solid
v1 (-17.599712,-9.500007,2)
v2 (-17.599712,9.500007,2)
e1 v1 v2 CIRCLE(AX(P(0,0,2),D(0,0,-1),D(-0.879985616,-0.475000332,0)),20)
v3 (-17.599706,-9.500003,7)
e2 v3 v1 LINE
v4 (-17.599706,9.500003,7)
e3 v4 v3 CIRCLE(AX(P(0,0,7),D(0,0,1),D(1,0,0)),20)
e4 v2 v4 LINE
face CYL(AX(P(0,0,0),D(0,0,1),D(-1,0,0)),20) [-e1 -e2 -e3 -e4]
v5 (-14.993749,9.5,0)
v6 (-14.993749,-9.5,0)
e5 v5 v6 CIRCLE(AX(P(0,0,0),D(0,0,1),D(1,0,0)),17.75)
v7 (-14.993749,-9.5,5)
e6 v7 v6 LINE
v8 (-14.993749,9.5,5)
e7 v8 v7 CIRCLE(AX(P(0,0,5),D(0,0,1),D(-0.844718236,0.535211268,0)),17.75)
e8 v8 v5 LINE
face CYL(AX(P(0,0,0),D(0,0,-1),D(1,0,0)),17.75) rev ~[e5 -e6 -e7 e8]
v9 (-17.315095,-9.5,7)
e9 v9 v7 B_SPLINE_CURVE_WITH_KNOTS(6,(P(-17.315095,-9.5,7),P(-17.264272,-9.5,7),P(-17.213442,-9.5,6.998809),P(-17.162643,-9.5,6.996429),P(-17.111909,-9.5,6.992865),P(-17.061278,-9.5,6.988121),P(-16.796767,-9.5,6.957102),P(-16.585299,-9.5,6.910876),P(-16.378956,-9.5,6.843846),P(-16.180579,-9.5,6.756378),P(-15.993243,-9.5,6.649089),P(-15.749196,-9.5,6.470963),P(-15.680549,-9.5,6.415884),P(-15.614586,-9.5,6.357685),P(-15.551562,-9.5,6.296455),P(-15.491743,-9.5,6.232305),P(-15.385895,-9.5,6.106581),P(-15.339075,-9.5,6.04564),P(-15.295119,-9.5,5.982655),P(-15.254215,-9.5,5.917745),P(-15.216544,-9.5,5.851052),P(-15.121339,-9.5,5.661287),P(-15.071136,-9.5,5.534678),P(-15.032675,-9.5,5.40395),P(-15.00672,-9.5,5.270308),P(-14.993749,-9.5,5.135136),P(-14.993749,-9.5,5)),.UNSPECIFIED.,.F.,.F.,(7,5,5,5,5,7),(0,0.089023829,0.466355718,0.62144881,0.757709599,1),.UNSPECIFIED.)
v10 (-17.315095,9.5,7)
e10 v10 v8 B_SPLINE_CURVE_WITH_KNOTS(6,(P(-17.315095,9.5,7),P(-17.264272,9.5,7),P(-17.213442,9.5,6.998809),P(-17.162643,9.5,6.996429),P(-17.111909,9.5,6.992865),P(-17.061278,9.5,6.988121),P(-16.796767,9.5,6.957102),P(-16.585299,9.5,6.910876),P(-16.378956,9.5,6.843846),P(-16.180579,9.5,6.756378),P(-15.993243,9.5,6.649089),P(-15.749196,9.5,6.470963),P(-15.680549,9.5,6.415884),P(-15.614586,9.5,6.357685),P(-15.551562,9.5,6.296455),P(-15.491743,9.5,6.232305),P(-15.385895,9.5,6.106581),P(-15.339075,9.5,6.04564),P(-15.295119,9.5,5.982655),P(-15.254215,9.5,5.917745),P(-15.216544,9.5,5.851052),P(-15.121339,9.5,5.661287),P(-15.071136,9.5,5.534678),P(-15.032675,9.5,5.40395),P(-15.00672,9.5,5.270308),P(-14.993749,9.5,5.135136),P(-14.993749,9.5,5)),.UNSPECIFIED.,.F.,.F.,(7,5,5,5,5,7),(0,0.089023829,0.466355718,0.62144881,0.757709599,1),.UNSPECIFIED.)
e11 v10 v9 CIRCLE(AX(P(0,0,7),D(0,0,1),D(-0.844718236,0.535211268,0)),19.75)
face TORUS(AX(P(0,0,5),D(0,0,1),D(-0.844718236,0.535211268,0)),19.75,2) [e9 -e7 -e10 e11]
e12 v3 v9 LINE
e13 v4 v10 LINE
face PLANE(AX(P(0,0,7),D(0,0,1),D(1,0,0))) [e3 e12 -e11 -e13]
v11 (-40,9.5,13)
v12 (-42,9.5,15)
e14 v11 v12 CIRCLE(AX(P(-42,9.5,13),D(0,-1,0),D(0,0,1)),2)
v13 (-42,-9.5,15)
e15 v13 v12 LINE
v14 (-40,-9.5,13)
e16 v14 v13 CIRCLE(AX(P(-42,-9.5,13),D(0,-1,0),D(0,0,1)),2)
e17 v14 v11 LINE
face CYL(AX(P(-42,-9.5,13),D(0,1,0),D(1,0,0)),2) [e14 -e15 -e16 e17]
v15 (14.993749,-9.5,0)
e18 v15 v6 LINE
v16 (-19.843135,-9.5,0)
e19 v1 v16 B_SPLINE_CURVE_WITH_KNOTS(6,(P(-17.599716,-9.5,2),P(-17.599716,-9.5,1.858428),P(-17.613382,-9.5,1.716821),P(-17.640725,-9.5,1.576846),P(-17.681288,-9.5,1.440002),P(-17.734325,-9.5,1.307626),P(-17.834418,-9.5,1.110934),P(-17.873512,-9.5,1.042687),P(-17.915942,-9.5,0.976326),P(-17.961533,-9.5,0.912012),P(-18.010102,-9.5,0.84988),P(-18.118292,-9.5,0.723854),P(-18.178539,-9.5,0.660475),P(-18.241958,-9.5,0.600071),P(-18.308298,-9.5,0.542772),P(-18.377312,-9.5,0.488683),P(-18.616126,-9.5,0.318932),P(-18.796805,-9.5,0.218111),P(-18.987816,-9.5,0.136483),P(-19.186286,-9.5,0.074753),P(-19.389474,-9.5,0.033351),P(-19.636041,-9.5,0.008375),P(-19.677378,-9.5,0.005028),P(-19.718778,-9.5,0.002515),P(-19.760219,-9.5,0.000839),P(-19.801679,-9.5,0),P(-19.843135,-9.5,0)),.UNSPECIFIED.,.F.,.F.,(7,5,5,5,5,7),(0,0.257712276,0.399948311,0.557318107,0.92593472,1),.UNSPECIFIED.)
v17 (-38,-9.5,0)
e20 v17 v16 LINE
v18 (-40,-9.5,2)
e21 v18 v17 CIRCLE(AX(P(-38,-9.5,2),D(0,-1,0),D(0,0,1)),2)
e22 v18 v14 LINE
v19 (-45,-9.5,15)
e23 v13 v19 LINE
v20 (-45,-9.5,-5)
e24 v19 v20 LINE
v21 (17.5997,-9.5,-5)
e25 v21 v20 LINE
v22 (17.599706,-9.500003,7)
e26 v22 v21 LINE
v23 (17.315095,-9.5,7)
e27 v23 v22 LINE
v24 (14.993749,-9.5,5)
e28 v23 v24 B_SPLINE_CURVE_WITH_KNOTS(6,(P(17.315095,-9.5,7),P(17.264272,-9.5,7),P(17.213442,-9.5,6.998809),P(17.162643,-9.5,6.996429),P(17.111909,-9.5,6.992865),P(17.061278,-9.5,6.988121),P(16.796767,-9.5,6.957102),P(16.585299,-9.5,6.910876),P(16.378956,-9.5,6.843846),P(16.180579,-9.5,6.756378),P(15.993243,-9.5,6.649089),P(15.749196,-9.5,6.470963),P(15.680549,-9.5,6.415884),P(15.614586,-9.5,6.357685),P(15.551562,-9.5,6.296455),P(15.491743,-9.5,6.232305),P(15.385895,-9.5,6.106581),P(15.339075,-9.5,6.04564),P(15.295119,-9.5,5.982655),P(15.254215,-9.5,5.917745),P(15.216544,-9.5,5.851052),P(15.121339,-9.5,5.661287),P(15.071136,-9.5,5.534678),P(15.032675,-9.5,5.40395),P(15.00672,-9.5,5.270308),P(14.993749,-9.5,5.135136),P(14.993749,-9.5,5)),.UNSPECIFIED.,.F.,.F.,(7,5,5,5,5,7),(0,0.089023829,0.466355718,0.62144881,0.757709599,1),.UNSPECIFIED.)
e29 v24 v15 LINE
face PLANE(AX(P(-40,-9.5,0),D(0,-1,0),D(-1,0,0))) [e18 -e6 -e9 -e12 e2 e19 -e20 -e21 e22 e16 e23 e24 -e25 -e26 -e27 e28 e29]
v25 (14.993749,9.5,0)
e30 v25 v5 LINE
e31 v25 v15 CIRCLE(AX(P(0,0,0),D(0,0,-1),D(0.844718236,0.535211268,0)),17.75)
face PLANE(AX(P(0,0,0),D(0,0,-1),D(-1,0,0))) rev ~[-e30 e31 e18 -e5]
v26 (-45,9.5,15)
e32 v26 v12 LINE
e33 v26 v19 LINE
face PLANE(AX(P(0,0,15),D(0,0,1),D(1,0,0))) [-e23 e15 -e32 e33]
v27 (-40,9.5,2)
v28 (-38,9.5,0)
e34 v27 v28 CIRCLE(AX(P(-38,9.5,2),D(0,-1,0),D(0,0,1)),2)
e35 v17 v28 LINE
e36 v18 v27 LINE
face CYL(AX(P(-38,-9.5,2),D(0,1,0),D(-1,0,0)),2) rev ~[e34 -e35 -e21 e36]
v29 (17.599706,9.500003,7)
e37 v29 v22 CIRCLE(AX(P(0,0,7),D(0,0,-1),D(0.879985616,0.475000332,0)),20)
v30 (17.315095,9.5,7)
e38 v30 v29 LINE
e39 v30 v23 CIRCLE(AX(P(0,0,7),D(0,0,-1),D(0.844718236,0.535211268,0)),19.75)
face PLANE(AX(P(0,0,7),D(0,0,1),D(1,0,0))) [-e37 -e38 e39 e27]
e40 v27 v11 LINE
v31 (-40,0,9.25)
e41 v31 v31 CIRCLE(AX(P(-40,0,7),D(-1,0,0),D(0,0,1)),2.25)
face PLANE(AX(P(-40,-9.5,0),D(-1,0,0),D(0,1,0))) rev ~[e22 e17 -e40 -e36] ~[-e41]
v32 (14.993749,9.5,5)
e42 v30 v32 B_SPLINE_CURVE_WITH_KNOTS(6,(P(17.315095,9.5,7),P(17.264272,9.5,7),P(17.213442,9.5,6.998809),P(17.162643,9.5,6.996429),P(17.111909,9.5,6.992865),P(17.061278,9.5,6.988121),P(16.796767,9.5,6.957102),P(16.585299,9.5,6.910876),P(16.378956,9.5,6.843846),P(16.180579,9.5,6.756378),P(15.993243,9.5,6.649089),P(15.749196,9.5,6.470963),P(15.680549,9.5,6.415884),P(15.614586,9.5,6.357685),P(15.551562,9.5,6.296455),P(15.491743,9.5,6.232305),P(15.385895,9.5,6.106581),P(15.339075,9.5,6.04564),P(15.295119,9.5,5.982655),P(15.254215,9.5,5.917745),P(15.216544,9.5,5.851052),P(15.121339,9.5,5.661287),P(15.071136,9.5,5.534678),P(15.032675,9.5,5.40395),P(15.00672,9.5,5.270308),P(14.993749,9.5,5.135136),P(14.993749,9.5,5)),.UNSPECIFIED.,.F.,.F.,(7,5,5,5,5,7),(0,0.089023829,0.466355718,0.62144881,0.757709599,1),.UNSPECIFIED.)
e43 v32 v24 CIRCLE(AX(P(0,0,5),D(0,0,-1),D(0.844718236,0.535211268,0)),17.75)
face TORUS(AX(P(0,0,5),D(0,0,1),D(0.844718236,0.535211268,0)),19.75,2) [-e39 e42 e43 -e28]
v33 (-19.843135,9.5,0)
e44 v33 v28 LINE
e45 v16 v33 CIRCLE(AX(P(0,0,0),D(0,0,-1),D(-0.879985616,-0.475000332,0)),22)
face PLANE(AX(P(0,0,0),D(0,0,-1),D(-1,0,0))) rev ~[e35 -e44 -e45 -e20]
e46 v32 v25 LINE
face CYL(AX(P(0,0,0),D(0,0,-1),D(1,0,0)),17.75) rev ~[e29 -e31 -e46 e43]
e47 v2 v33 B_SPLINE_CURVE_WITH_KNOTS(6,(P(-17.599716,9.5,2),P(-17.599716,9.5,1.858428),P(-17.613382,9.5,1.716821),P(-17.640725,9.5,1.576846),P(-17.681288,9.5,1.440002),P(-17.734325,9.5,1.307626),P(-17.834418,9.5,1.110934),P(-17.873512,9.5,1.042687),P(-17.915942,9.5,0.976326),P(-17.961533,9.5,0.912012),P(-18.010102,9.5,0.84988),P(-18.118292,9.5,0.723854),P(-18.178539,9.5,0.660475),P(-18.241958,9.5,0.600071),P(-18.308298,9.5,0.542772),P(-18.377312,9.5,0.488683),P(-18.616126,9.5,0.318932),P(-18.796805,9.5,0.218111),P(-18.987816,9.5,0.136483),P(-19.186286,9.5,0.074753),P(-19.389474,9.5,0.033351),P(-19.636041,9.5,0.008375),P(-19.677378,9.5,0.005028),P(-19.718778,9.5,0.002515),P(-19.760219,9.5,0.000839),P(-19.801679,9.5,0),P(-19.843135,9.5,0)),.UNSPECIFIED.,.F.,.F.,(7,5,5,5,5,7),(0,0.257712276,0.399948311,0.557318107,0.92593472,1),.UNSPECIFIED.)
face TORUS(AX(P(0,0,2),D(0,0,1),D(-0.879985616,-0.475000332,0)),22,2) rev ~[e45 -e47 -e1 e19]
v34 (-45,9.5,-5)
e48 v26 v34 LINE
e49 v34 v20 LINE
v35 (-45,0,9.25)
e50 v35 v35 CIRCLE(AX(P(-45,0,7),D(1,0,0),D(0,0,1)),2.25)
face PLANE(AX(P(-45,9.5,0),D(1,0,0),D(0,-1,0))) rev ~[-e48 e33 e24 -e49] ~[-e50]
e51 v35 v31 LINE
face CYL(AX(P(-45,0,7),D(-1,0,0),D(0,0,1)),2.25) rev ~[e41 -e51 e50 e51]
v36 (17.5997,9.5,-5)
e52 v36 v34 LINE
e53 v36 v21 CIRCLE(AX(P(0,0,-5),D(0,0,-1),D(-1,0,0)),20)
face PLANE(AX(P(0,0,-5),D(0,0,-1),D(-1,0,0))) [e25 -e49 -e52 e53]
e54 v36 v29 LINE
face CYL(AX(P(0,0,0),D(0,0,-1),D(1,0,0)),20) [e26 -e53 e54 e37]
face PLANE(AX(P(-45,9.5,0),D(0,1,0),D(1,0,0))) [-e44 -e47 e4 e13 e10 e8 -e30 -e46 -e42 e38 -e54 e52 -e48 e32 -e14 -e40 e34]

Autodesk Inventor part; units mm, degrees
ref_plane "YZ Plane" through (0, 0, 0) normal (1, 0, 0) x (0, 1, 0)
ref_plane "XZ Plane" through (0, 0, 0) normal (0, 1, 0) x (-1, 0, 0)
ref_plane "XY Plane" through (0, 0, 0) normal (0, 0, 1) x (1, 0, 0)
sketch "Sketch1" plane through (0, 0, 0) normal (0, 0, 1) x (1, 0, 0)
  circle A0 centre (0, 0) radius 17.75
  circle A1 centre (0, 0) radius 20
  dimension "d0" = 35.5
  dimension "d1" = 40
extrude "Extrusion1" add sketch "Sketch1" along normal blind 7
sketch "Sketch2" plane through (0, 0, 0) normal (0, 0, -1) x (-1, 0, 0)
  circle A0 centre (0, 0) radius 20 projected
extrude "Extrusion2" add sketch "Sketch2" along normal blind 5
sketch "Sketch3" plane through (0, 0, -5) normal (0, 0, -1) x (-1, 0, 0)
  circle A0 centre (0, 0) radius 20 projected
  line L0 (-17.5997, 9.5) -> (17.5997, 9.5)
  line L1 (-17.5997, -9.5) -> (17.5997, -9.5)
  circle A1 centre (0, 0) radius 20 projected
  line L2 (58, 0) -> (-33, 0) projected
  dimension "d6" = 19
  dimension "d7" = 9.5
extrude "Extrusion3" cut sketch "Sketch3" against normal through all contours L0 A0 | A0 L1
sketch "Sketch4" plane through (0, 0, -5) normal (0, 0, -1) x (-1, 0, 0)
  arc A0 (17.5997, -9.5) -> (17.5997, 9.5) centre (0, 0) ccw projected
  line L0 (17.5997, 9.5) -> (45, 9.5)
  line L1 (45, 9.5) -> (45, -9.5)
  arc A1 (17.5997, -9.5) -> (17.5997, 9.5) centre (0, 0) ccw projected
  line L2 (45, -9.5) -> (17.5997, -9.5)
  line L3 (14.9937, -9.5) -> (-14.9937, -9.5) projected
  arc A2 (-14.9937, 9.5) -> (-14.9937, -9.5) centre (0, 0) ccw projected
  line L4 (-14.9937, 9.5) -> (14.9937, 9.5) projected
  arc A3 (14.9937, -9.5) -> (14.9937, 9.5) centre (0, 0) ccw projected
  dimension "d10" = 90
  dimension "d11" = 45
extrude "Extrusion4" add sketch "Sketch4" against normal blind 5 contours A0 L0 L1 L2
sketch "Sketch5" plane through (0, 0, 0) normal (0, 0, 1) x (1, 0, 0)
  line L0 (17.5997, -9.5) -> (-45, -9.5) projected
  line L1 (-45, 9.5) -> (17.5997, 9.5) projected
  line L2 (-45, -9.5) -> (-40, -9.5)
  line L3 (-40, -9.5) -> (-40, 9.5)
  line L4 (-40, 9.5) -> (-45, 9.5)
  line L5 (-45, 9.5) -> (-45, -9.5)
  point P0 (0, 0)
  dimension "d14" = 5
extrude "Extrusion5" add sketch "Sketch5" along normal blind 15
sketch "Sketch6" plane through (-40, -9.5, 0) normal (1, 0, 0) x (0, 0, -1)
  point P0 (0, 9.5)
sketch "Sketch7" plane through (-45, -9.5, -5) normal (-1, 0, 0) x (0, 0, 1)
  line L0 (12, 19) -> (12, 0) projected
  circle A0 centre (12, 9.5) radius 2.25
  point P0 (5, 9.5)
  dimension "d17" = 4.5
extrude "Extrusion6" cut sketch "Sketch7" against normal up to surface (5 mm away)
fillet "Fillet1" radius 2 1 edges at (-40, 0, 0)
fillet "Fillet2" radius 2 1 edges at (-40, 0, 15)
fillet "Fillet3" radius 2 2 edges at (-17.75, 0, 7) (17.75, 0, 7)
fillet_without_effect "Fillet4"
fillet "Fillet6" radius 2 1 edges at (-20, 0, 0)
properties part number "Lid_holder"
